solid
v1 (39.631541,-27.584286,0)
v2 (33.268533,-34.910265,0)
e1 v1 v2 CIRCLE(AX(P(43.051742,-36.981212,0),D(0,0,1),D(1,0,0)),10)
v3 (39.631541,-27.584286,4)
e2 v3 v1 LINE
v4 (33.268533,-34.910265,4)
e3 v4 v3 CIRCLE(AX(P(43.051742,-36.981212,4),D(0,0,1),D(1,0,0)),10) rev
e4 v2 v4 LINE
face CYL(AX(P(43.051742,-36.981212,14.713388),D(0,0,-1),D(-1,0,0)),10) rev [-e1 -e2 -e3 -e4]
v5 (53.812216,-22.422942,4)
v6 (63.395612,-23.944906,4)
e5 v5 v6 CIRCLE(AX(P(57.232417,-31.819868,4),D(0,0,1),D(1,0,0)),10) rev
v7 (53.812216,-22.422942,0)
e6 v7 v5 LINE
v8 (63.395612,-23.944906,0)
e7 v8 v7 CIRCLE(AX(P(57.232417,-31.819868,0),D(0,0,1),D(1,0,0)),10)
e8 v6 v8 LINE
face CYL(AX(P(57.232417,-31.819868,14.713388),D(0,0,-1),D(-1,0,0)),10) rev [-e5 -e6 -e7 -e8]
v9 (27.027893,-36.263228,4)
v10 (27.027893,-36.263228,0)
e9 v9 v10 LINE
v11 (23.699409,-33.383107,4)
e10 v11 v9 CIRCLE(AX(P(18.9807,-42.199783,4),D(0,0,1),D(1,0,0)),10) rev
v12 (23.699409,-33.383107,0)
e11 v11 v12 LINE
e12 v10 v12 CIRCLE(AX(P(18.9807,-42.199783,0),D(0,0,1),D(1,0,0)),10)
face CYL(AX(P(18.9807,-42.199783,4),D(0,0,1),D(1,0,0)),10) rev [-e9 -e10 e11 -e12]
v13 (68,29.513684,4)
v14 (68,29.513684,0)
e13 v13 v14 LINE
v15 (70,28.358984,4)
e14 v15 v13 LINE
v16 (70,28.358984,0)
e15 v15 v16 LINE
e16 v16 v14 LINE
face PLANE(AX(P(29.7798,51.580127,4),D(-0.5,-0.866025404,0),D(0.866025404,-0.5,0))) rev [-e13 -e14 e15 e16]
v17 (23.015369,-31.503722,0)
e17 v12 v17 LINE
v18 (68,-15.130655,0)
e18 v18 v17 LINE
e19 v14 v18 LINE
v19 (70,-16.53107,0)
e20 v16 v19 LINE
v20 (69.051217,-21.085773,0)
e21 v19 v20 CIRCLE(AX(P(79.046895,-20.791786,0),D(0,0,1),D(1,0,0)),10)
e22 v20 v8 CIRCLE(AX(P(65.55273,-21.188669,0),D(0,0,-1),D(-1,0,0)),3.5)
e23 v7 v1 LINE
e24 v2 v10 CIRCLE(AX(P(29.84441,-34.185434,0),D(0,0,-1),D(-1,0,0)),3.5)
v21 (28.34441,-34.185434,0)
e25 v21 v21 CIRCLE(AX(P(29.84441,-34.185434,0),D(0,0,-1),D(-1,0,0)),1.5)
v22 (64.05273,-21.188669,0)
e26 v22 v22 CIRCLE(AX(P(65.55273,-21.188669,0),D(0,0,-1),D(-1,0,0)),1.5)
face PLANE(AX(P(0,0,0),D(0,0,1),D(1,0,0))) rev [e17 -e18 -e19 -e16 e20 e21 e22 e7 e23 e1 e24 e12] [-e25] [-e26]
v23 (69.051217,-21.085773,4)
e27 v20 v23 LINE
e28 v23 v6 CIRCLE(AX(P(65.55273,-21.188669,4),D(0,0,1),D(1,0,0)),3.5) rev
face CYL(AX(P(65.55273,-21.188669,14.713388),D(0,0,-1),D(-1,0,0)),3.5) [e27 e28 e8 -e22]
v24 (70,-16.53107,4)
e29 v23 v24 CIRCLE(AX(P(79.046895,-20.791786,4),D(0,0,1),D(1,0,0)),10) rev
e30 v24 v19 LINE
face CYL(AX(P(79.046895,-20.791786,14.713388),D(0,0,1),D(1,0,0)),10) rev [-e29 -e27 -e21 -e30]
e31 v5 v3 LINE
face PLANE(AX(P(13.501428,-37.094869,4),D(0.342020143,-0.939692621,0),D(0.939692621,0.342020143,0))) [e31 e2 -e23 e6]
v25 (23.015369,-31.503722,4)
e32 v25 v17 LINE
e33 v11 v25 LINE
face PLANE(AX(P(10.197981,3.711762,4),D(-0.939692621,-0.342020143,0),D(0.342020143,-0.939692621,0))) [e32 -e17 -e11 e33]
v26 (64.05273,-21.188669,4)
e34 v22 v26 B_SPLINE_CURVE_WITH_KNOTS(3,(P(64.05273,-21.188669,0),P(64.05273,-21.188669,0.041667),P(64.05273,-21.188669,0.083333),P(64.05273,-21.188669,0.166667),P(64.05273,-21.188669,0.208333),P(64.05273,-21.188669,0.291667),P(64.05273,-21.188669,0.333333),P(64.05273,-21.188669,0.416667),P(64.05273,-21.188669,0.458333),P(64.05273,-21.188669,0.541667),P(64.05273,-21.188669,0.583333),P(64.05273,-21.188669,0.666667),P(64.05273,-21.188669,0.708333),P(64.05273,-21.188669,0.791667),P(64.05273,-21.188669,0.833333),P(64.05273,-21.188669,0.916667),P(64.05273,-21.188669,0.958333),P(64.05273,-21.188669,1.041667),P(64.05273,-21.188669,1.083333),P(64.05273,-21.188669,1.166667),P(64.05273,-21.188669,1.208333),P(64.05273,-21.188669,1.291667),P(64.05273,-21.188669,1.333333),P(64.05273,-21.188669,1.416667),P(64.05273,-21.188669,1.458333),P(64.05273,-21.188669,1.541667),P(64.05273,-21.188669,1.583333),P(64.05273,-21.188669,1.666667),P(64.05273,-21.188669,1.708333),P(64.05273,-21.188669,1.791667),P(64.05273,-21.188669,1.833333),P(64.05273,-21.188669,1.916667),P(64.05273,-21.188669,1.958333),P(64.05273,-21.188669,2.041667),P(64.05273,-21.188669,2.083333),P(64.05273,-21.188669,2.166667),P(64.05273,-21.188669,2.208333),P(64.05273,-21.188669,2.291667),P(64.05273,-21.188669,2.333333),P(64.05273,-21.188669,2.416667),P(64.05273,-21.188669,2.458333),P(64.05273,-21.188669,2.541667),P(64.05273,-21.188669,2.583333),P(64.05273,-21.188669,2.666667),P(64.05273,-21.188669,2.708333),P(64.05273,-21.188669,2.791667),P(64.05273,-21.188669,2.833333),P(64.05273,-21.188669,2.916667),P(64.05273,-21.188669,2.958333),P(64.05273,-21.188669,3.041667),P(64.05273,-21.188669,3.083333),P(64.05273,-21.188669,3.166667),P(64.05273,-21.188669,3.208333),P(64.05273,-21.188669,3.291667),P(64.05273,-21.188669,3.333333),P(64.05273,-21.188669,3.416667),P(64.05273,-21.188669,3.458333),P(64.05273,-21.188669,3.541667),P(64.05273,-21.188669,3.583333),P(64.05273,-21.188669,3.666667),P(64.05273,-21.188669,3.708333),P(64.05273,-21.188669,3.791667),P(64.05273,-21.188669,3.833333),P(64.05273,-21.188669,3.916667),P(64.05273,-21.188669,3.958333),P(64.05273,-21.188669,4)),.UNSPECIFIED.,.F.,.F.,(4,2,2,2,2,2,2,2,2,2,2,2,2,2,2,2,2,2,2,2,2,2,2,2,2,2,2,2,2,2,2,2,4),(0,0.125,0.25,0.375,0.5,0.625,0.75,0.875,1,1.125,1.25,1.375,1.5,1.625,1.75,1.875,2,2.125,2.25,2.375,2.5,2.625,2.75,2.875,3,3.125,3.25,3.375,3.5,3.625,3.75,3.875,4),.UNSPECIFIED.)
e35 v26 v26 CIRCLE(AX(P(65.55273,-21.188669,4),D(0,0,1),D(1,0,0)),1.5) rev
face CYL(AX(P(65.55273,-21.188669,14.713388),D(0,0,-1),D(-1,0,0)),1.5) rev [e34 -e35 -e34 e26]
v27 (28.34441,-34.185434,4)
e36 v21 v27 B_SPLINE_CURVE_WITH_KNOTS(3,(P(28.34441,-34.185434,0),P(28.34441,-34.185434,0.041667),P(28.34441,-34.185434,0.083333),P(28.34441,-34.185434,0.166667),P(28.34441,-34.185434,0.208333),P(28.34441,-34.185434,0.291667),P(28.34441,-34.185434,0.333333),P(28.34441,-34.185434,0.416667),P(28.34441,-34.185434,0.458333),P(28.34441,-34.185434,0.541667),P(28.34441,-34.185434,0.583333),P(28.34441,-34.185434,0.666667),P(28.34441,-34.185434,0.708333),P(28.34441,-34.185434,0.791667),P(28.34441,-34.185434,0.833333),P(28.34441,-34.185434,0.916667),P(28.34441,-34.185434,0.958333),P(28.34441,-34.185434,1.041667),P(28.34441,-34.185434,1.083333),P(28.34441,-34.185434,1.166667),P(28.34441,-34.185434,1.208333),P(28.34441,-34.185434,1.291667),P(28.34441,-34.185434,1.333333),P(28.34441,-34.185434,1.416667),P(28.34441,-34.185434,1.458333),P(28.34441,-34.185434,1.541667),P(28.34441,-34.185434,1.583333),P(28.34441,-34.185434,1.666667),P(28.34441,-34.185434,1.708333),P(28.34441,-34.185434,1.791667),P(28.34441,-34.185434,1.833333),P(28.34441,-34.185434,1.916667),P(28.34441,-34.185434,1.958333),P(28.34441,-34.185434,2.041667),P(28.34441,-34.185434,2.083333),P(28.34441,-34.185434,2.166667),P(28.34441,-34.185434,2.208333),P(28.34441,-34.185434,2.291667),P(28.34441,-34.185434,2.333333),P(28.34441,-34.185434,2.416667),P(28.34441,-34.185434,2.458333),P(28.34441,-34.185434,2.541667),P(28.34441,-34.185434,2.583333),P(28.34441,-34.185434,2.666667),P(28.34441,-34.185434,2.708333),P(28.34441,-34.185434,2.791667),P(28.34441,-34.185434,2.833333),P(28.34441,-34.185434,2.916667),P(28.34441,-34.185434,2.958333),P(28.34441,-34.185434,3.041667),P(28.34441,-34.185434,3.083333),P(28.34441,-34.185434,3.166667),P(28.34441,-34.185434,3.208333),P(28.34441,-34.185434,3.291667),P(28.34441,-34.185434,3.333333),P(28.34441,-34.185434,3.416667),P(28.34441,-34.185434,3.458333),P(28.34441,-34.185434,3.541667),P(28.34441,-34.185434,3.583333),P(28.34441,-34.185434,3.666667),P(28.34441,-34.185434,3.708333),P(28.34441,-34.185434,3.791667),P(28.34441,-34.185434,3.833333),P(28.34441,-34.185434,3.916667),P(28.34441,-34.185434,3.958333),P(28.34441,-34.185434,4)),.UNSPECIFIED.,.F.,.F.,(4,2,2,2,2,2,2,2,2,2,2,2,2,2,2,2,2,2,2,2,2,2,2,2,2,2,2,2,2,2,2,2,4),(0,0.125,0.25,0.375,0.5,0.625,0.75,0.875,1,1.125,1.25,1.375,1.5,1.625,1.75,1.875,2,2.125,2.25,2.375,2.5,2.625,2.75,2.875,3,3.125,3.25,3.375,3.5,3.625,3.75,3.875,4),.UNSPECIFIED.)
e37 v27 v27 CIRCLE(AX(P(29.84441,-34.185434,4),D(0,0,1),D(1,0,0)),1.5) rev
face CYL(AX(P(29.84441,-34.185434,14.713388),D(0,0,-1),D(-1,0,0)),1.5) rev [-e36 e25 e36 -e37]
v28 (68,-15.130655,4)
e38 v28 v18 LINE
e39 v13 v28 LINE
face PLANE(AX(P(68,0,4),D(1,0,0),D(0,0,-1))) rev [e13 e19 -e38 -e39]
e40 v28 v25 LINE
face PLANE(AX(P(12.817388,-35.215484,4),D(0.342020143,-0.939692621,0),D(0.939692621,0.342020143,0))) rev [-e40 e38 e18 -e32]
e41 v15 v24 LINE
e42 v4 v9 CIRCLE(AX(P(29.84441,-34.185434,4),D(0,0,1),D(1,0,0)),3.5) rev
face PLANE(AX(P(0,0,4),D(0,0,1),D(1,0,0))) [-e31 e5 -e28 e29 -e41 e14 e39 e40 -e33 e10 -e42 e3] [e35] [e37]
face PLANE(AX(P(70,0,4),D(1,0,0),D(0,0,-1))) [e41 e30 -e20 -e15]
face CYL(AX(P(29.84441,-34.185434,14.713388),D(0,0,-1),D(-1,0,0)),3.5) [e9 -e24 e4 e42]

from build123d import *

# Parameters (mm, degrees)
BOSS_EXTRUDE1_DEPTH = 4
SKETCH3_R           = 1.5
BOSS_EXTRUDE3_DEPTH = 4
LPATTERN2_COUNT     = 2
LPATTERN2_PITCH     = 38
FILLET1_DEPTH       = 4


with BuildPart() as part:
    # Sketch1 → Boss-Extrude1 (new body)
    with BuildSketch(Plane.XY):
        Polygon((23.699409247, -33.383107264), (23.015368961, -31.503722023), (70, -14.402714856), (70, -16.531070401), align=None)
        Polygon((68, -15.130655325), (70, -14.402714856), (70, 28.358983849), (68, 29.513684387), align=None)
    extrude(amount=BOSS_EXTRUDE1_DEPTH)

    # Sketch3 → Boss-Extrude3 (add)
    # profile 1 of 3: a face of its own
    with BuildSketch(Plane(origin=(0, 0, 0), x_dir=(-1, 0, 0), z_dir=(0, 0, -1))):
        with BuildLine():
            ThreePointArc((-33.133334302, -32.988363728), (-31.041480631, -37.474358403), (-26.555485957, -35.382504732))
            ThreePointArc((-26.555485957, -35.382504732), (-26.397582994, -34.793202852), (-26.34441013, -34.18543423))
            ThreePointArc((-26.34441013, -34.18543423), (-26.503443688, -33.142389054), (-26.96609198, -32.194131985))
            Line((-26.96609198, -32.194131985), (-30.769345343, -30.809860967))
            ThreePointArc((-30.769345343, -30.809860967), (-32.216249353, -31.61164739), (-33.133334302, -32.988363728))
        make_face()
        with Locations((-29.84441013, -34.18543423)):
            Circle(SKETCH3_R, mode=Mode.SUBTRACT)
    # profile 2 of 3: a face of its own
    with BuildSketch(Plane(origin=(0, 0, 0), x_dir=(-1, 0, 0), z_dir=(0, 0, -1))):
        with BuildLine():
            ThreePointArc((-26.34441013, -34.18543423), (-26.397582994, -34.793202852), (-26.555485957, -35.382504732))
            Line((-26.555485957, -35.382504732), (-25.578794489, -32.699066978))
            Line((-25.578794489, -32.699066978), (-26.96609198, -32.194131985))
            ThreePointArc((-26.96609198, -32.194131985), (-26.503443688, -33.142389054), (-26.34441013, -34.18543423))
        make_face()
    # profile 3 of 3: a face of its own
    with BuildSketch(Plane(origin=(0, 0, 0), x_dir=(-1, 0, 0), z_dir=(0, 0, -1))):
        with BuildLine():
            Line((-32.156642834, -30.304925974), (-33.133334302, -32.988363728))
            ThreePointArc((-33.133334302, -32.988363728), (-32.216249353, -31.61164739), (-30.769345343, -30.809860967))
            Line((-30.769345343, -30.809860967), (-32.156642834, -30.304925974))
        make_face()
    boss_extrude3 = extrude(amount=-BOSS_EXTRUDE3_DEPTH)

    # LPattern2: Boss-Extrude3 ×2
    with Locations(*[Vector(0.9396926207859079, 0.3420201433256704, 0) * (i * LPATTERN2_PITCH) for i in range(1, LPATTERN2_COUNT)]):
        add(boss_extrude3)

    # Fillet1: read off the stored shape, not the designer's step
    # Fillet1 outline → Fillet1 (add)
    with BuildSketch(Plane.XY):
        with BuildLine():
            ThreePointArc((68.841653892, -19.991598282), (68.990249602, -20.53029423), (69.051216895, -21.085773301))
            ThreePointArc((69.051216895, -21.085773301), (69.257041708, -18.75247713), (70, -16.531070401))
            Line((70, -16.531070401), (67.864962424, -17.308160528))
            Line((67.864962424, -17.308160528), (68.841653892, -19.991598282))
        make_face()
        with BuildLine():
            Line((61.287114079, -19.702301531), (53.812215852, -22.42294199))
            ThreePointArc((53.812215852, -22.42294199), (58.800886589, -21.943638956), (63.395611681, -23.944905669))
            ThreePointArc((63.395611681, -23.944905669), (62.720311337, -23.244734469), (62.263805547, -22.385739285))
            Line((62.263805547, -22.385739285), (61.287114079, -19.702301531))
        make_face()
        with BuildLine():
            ThreePointArc((33.133334302, -32.988363728), (33.33578204, -33.939828481), (33.268533335, -34.910265432))
            ThreePointArc((33.268533335, -34.910265432), (35.501907513, -30.423773828), (39.631541062, -27.584285515))
            Line((39.631541062, -27.584285515), (32.156642834, -30.304925974))
            Line((32.156642834, -30.304925974), (33.133334302, -32.988363728))
        make_face()
        with BuildLine():
            ThreePointArc((23.699409247, -33.383107264), (25.524081147, -34.637762706), (27.027892588, -36.263228478))
            ThreePointArc((27.027892588, -36.263228478), (26.760091208, -35.839815319), (26.555485957, -35.382504732))
            Line((26.555485957, -35.382504732), (25.578794489, -32.699066978))
            Line((25.578794489, -32.699066978), (23.699409247, -33.383107264))
        make_face()
    extrude(amount=FILLET1_DEPTH)


solid = part.part
